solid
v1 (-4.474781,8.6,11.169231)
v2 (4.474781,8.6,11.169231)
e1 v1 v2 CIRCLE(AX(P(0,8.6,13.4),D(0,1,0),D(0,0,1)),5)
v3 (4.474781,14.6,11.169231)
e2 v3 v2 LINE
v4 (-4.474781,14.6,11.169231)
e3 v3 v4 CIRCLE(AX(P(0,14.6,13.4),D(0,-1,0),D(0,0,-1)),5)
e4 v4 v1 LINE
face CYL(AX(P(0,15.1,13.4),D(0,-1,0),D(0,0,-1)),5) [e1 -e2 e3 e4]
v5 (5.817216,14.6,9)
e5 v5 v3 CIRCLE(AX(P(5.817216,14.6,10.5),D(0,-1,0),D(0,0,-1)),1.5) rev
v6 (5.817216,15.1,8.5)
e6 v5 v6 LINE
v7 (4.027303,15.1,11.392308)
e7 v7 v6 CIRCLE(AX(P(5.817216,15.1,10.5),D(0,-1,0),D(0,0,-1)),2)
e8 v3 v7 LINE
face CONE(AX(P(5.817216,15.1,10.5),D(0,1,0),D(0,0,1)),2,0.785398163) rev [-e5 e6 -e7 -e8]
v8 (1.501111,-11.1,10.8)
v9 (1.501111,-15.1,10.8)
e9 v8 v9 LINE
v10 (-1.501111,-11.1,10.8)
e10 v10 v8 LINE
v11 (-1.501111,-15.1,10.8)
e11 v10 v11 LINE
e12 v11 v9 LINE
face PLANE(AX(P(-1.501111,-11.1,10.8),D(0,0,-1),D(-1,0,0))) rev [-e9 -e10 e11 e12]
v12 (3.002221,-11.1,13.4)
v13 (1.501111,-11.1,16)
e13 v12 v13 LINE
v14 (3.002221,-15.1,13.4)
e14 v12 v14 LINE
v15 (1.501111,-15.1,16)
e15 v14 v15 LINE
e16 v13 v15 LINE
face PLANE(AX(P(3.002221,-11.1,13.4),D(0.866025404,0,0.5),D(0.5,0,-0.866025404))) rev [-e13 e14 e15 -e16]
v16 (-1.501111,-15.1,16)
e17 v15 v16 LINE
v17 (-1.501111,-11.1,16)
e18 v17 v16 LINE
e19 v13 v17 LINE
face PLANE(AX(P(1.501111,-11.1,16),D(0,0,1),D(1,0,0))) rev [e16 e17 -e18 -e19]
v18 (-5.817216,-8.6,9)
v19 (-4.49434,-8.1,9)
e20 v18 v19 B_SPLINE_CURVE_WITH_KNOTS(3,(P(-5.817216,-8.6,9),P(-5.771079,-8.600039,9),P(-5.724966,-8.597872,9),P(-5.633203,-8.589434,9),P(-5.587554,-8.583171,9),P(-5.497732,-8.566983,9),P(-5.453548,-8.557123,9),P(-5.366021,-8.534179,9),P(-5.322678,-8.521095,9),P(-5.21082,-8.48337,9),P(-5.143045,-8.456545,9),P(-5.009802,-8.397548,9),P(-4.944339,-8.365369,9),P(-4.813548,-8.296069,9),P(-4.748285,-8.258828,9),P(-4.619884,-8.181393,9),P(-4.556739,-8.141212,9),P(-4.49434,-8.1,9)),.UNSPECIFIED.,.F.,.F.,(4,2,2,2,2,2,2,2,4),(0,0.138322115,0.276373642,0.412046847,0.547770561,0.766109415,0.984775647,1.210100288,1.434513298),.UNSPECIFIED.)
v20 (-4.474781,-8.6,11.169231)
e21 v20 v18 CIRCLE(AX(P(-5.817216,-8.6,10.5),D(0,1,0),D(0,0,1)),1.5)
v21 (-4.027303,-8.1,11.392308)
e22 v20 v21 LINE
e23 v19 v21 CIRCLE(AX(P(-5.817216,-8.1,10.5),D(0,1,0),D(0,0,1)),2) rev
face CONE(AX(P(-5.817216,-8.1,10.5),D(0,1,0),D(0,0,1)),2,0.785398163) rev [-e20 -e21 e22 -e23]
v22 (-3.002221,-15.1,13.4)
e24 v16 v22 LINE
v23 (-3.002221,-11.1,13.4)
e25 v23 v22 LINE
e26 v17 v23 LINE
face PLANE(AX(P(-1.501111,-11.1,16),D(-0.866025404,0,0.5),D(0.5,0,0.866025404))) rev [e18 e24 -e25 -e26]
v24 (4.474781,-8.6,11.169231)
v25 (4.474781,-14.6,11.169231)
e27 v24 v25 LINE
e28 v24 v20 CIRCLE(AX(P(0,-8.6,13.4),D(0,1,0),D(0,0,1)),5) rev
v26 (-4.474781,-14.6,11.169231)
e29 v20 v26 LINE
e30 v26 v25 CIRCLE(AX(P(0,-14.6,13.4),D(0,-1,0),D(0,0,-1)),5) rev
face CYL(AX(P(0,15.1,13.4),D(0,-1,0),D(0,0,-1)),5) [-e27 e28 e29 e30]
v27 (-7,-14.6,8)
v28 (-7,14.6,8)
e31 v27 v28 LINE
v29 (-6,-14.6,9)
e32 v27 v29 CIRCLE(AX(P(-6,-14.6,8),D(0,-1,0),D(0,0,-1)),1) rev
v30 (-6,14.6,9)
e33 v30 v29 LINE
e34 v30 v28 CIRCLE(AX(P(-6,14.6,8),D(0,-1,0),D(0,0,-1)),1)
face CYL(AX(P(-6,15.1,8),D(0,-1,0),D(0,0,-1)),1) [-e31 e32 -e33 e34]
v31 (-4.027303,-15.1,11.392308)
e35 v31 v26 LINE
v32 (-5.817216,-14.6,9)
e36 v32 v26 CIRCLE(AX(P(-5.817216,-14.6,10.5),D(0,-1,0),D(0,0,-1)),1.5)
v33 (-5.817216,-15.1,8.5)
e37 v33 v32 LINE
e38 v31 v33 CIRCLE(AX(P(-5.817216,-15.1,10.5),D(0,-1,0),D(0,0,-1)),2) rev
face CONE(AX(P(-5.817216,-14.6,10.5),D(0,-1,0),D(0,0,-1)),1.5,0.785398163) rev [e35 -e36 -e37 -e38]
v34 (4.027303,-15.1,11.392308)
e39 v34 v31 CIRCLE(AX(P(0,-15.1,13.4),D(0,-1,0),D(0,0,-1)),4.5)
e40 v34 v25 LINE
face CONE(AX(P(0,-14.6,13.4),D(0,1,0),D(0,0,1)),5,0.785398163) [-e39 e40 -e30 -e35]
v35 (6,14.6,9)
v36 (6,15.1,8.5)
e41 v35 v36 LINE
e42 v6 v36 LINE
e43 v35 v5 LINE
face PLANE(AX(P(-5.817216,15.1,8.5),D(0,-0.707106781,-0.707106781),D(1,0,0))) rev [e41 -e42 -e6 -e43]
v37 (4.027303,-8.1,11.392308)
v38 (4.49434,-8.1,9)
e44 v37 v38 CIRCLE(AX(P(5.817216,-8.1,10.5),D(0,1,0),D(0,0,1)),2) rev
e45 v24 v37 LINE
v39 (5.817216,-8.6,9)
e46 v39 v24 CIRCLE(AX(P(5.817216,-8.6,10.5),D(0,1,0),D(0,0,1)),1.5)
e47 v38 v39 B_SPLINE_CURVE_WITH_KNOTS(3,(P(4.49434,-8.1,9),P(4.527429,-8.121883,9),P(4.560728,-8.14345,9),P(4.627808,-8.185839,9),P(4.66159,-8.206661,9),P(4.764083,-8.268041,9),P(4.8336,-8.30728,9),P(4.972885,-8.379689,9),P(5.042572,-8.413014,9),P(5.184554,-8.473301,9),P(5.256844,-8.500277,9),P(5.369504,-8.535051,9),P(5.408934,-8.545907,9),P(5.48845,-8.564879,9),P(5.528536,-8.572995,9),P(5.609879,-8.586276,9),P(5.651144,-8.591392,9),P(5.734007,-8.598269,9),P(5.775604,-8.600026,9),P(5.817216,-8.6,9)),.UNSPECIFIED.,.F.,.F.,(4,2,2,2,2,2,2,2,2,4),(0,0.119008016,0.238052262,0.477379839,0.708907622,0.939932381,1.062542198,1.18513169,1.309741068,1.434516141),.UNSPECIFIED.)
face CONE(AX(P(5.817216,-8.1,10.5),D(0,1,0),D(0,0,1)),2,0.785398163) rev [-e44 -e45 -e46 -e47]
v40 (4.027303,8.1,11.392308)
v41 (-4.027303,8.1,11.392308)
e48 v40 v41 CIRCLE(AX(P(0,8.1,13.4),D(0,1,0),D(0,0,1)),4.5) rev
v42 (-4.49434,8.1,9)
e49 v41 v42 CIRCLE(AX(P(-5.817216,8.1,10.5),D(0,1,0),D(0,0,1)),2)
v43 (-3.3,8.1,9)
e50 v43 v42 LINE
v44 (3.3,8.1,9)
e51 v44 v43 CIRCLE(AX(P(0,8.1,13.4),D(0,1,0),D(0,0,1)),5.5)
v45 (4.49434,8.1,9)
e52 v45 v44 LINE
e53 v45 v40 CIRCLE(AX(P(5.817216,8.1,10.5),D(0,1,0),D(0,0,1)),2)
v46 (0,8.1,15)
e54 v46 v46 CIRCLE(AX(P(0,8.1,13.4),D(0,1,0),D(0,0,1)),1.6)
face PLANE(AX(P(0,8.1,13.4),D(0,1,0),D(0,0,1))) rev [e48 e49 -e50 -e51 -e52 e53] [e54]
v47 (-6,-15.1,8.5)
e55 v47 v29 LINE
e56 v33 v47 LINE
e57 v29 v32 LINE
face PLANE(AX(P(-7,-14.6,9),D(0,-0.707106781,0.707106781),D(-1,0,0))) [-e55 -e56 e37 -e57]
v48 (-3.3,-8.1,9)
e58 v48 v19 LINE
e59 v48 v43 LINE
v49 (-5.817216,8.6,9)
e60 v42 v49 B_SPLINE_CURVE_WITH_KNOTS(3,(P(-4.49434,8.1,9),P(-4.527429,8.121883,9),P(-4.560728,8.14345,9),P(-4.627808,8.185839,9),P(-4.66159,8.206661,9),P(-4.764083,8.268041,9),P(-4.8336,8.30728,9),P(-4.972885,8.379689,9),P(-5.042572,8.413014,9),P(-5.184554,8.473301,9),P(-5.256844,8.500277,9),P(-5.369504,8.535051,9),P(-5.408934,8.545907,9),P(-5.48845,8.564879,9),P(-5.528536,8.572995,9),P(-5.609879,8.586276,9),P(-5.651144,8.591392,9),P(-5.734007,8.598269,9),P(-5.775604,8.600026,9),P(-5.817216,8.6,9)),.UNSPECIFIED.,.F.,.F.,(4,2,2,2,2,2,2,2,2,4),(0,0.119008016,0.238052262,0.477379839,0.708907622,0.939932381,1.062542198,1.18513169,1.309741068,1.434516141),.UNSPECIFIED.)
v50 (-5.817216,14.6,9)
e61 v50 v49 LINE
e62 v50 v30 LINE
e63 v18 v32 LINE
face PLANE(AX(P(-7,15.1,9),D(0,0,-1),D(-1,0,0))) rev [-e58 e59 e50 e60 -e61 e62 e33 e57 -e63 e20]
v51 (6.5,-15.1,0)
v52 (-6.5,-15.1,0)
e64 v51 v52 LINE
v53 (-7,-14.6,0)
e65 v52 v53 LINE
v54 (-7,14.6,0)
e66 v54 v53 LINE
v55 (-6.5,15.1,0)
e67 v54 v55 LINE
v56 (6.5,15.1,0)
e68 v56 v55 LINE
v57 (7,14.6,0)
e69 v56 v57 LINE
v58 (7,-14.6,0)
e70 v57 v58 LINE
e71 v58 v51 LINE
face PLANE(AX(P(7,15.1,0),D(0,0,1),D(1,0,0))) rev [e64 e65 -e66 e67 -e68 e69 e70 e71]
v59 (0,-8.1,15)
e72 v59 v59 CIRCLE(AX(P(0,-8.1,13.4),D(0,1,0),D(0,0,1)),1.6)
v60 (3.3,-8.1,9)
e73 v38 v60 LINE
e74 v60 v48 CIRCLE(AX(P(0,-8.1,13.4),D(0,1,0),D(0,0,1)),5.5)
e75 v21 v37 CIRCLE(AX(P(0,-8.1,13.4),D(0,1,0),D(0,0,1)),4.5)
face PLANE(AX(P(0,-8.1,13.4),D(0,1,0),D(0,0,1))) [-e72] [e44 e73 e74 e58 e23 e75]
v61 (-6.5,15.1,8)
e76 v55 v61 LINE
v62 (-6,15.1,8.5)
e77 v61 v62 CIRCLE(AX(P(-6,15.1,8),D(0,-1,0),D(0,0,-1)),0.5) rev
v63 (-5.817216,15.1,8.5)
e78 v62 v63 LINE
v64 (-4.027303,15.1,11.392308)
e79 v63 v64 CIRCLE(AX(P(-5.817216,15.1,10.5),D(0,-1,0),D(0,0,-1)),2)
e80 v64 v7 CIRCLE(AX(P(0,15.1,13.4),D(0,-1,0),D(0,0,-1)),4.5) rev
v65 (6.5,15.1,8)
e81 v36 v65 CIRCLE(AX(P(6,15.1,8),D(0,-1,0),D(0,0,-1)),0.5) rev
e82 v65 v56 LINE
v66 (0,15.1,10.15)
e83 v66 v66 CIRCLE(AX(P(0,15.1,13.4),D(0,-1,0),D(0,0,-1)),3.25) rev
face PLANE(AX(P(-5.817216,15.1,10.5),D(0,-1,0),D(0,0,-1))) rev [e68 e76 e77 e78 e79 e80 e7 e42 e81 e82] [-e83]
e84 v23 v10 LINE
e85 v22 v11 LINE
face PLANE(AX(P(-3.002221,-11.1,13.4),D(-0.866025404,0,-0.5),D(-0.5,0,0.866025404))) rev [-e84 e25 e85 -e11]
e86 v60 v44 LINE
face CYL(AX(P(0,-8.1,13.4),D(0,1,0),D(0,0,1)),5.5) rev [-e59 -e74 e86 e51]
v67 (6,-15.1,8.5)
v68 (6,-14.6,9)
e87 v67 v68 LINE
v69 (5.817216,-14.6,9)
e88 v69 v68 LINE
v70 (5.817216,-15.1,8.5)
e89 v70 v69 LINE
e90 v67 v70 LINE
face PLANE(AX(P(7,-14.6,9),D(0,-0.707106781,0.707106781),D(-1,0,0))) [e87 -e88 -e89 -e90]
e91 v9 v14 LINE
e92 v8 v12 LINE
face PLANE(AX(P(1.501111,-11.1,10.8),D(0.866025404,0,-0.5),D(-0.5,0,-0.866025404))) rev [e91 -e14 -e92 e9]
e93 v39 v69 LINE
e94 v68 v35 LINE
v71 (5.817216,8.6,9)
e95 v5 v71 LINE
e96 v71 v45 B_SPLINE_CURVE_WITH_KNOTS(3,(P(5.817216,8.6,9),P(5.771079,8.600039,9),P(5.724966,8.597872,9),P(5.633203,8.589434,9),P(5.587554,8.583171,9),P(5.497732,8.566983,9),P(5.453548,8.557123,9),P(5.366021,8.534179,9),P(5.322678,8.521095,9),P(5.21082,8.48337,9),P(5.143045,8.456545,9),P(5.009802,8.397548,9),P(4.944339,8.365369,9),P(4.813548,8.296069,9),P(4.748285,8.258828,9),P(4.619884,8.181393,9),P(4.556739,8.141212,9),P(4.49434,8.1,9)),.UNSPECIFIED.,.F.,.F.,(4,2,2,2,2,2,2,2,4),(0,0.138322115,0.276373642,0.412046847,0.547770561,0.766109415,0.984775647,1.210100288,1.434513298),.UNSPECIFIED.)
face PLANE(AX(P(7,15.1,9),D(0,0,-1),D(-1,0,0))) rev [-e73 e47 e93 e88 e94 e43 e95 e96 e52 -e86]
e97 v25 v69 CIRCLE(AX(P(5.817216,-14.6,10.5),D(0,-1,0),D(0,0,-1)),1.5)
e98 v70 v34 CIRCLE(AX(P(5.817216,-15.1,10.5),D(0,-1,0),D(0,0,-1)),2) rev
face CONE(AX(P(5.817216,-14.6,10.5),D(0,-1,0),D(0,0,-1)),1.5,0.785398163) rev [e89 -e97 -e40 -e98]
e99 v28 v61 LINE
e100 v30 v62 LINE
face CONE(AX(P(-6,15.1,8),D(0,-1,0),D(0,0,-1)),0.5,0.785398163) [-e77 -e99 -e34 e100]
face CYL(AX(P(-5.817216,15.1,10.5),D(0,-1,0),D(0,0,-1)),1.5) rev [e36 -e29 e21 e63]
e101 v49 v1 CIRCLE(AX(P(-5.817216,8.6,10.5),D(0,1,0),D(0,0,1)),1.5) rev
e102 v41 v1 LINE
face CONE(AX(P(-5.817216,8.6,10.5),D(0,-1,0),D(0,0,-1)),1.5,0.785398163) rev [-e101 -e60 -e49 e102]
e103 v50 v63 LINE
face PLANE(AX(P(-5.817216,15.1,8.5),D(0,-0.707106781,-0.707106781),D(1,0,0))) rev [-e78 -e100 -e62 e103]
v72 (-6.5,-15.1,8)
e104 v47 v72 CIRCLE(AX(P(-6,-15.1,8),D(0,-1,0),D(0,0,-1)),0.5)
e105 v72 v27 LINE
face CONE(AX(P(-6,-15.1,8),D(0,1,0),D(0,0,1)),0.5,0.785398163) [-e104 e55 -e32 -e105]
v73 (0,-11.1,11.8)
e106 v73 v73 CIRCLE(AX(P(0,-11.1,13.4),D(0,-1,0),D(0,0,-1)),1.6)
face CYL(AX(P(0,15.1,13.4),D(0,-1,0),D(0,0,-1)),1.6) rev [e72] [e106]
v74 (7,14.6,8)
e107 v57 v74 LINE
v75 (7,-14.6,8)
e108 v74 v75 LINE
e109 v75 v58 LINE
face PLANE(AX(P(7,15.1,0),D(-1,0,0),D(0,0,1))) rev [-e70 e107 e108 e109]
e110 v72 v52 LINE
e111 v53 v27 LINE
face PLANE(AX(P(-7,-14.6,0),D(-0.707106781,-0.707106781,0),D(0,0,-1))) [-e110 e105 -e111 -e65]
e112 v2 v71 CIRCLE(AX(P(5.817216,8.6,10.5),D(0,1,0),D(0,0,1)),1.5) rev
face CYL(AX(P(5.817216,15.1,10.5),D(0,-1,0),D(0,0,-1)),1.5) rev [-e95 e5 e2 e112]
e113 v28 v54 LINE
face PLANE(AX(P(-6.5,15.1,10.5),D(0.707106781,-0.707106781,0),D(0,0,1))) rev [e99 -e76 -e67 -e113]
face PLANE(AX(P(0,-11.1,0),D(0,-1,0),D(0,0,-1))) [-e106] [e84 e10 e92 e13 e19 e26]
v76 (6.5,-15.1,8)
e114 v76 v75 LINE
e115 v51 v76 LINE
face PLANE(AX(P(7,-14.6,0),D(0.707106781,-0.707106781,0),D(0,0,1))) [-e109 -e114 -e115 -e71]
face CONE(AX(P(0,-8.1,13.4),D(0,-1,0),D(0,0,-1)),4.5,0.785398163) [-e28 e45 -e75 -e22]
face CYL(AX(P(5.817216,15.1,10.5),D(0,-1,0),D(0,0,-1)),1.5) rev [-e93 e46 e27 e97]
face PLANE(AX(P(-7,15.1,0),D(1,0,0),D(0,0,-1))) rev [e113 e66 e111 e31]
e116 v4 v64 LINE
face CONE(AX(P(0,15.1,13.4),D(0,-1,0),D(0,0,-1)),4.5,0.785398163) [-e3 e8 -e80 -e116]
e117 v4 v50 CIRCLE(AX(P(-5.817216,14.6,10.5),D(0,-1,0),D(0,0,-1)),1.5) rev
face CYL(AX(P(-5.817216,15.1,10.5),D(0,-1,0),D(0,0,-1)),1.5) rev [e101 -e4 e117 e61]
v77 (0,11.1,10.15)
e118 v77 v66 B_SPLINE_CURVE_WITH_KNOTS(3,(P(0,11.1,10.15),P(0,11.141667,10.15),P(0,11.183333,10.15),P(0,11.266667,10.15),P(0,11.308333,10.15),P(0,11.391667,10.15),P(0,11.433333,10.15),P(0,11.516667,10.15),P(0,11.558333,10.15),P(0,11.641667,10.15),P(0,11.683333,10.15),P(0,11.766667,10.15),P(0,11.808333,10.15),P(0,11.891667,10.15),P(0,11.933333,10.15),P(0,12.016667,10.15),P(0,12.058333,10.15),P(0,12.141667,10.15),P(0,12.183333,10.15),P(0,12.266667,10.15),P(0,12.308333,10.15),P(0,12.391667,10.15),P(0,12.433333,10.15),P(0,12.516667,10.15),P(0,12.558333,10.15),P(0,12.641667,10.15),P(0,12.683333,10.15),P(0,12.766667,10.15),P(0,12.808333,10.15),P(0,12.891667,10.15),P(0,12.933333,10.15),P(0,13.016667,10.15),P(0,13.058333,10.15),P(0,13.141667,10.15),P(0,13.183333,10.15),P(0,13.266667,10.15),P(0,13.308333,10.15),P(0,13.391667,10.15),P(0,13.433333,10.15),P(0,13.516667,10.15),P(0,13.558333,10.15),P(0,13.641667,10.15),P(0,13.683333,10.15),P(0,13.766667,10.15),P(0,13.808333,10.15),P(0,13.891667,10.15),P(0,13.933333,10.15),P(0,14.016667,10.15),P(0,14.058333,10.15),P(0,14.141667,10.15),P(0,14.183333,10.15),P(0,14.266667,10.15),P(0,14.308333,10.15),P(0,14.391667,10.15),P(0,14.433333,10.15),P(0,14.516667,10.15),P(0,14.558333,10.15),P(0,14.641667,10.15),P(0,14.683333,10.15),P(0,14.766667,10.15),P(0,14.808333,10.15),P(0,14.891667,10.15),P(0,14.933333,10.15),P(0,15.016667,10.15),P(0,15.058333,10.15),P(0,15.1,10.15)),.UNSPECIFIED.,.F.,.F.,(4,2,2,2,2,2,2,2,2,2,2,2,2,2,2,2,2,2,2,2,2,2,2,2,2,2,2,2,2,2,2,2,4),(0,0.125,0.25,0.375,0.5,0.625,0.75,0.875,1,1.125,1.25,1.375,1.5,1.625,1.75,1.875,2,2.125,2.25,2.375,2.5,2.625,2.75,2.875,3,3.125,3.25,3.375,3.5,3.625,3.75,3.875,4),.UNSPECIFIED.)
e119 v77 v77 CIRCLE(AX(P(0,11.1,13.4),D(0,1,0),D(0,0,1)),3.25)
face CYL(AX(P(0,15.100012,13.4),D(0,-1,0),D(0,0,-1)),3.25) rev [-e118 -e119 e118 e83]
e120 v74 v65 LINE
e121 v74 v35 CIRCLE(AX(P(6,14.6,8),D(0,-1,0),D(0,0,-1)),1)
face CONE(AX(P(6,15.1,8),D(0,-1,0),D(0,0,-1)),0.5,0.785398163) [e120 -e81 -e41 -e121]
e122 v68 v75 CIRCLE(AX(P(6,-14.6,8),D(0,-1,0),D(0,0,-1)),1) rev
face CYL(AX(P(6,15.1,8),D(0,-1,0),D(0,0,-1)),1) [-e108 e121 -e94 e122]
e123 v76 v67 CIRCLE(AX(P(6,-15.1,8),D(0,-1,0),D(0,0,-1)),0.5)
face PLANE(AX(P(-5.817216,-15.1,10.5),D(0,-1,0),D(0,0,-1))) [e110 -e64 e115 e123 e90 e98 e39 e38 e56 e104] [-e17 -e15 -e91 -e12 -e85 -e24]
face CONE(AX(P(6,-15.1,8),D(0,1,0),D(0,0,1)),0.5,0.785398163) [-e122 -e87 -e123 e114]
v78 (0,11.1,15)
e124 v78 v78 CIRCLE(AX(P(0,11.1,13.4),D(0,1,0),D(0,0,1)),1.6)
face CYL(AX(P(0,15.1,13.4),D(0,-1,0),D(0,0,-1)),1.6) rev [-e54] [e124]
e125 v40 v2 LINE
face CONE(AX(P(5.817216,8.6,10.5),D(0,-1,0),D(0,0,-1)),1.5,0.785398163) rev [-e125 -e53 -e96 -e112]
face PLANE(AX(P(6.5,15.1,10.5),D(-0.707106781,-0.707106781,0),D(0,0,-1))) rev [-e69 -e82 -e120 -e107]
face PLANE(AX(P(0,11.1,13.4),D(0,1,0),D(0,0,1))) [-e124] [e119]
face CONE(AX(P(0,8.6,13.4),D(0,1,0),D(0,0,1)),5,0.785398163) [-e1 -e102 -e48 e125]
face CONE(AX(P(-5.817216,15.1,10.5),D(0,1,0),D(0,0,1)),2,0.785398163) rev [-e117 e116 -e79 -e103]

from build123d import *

# Parameters (mm, degrees)
CROQUIS2_R                 = 1.6
SALIENTE_EXTRUIR1_DEPTH    = 15.1
CORTAR_EXTRUIR4_DEPTH      = 8.1
CORTAR_EXTRUIR2_DEPTH      = 37.049965326
CORTAR_EXTRUIR2_DEPTH_BACK = 4
CROQUIS4_R                 = 3.25
CORTAR_EXTRUIR3_DEPTH      = 4
REDONDEO2_R                = 1
CHAFL_N1_SIZE              = 0.5


with BuildPart() as part:
    # Croquis2 → Saliente-Extruir1 (new, symmetric)
    with BuildSketch(Plane(origin=(0, 0, 0), x_dir=(0, 0, -1), z_dir=(0, 1, 0))):
        with BuildLine():
            Line((0, -7), (0, 7))
            Line((0, 7), (-9, 7))
            Line((-9, 7), (-9, 5.817215829))
            ThreePointArc((-9, 5.817215829), (-9.710647783, 4.541706881), (-11.169230769, 4.474781407))
            ThreePointArc((-11.169230769, 4.474781407), (-18.4, 0), (-11.169230769, -4.474781407))
            ThreePointArc((-11.169230769, -4.474781407), (-9.710647783, -4.541706881), (-9, -5.817215829))
            Line((-9, -5.817215829), (-9, -7))
            Line((-9, -7), (0, -7))
        make_face()
        with Locations(Location((-13.4, 0, 0), (0, 0, 180))):
            Circle(CROQUIS2_R, mode=Mode.SUBTRACT)
    extrude(amount=SALIENTE_EXTRUIR1_DEPTH, both=True)

    # Croquis6 → Cortar-Extruir4 (cut, symmetric)
    with BuildSketch(Plane(origin=(0, 0, 0), x_dir=(1, 0, 0), z_dir=(0, 1, 0))):
        with BuildLine():
            Line((-7, -9), (-3.3, -9))
            ThreePointArc((-3.3, -9), (0, -7.9), (3.3, -9))
            Line((3.3, -9), (7, -9))
            Line((7, -9), (7, -18.9))
            Line((7, -18.9), (-7, -18.9))
            Line((-7, -18.9), (-7, -9))
        make_face()
    extrude(amount=CORTAR_EXTRUIR4_DEPTH, both=True, mode=Mode.SUBTRACT)

    # Croquis4 → Cortar-Extruir2 (cut, two sides: drawn at the far end of the back side and taken through both)
    with BuildSketch(Plane(origin=(0, 15.1, 0), x_dir=(1, 0, 0), z_dir=(0, 1, 0)).offset(-CORTAR_EXTRUIR2_DEPTH_BACK)):
        with Locations(Location((0, -13.4, 0), (0, 0, 90))):
            Circle(CROQUIS4_R)
    extrude(amount=CORTAR_EXTRUIR2_DEPTH + CORTAR_EXTRUIR2_DEPTH_BACK, mode=Mode.SUBTRACT)

    # Croquis5 → Cortar-Extruir3 (cut)
    with BuildSketch(Plane.XZ.offset(15.1)):
        Polygon((1.5011107, 10.8), (3.0022214, 13.4), (1.5011107, 16), (-1.5011107, 16), (-3.0022214, 13.4), (-1.5011107, 10.8), align=None)
    extrude(amount=-CORTAR_EXTRUIR3_DEPTH, mode=Mode.SUBTRACT)

    # Redondeo2
    redondeo2_edges = [part.edges().sort_by_distance(p)[0] for p in [
        (7, 0, 9),
        (-7, 0, 9),
    ]]
    fillet(redondeo2_edges, radius=REDONDEO2_R)

    # Chaflán1
    # the kernel refuses this chamfer: 0.5 mm, written as the material it takes off along each edge
    with BuildSketch(Plane(origin=(0, -15.1, 13.4), x_dir=(-0.8949562813691682, 0, -0.44615384615384657), z_dir=(0.44615384615384657, 0, -0.8949562813691682))) as chafl_n1_piece_1:
        Polygon((5 - CHAFL_N1_SIZE, 0), (5, CHAFL_N1_SIZE), (5, 0), align=None)
    revolve(axis=Axis((0, -15.1, 13.4), (0, 1, 0)), revolution_arc=232.994370335, mode=Mode.SUBTRACT)
    with BuildSketch(Plane(origin=(-5.817215829, -15.1, 10.5), x_dir=(0, 0, -1), z_dir=(-1, 0, 0))) as chafl_n1_piece_2:
        Polygon((1.5 + CHAFL_N1_SIZE, 0), (1.5, -CHAFL_N1_SIZE), (1.5, 0), align=None)
    revolve(axis=Axis((-5.817215829, -15.1, 10.5), (0, -1, 0)), revolution_arc=116.497185168, mode=Mode.SUBTRACT)
    with BuildSketch(Plane(origin=(-7, -15.1, -1.285841494), x_dir=(0.9996219169112968, -0.027495876610585647, 0), z_dir=(0, 0, 1)), Plane(origin=(-7, 15.1, -1.285841494), x_dir=(-0.027495876610585647, -0.9996219169112968, 0), z_dir=(0, 0, 1)), Plane(origin=(7, -15.1, 8), x_dir=(-0.9996219169112968, -0.027495876610585647, 0), z_dir=(0, 0, -1)), Plane(origin=(7, 15.1, 8), x_dir=(0.027495876610585647, -0.9996219169112968, 0), z_dir=(0, 0, -1))) as chafl_n1_piece_3:
        Polygon((CHAFL_N1_SIZE * 0.999621916911, CHAFL_N1_SIZE * 0.0274958766106), (-CHAFL_N1_SIZE * 0.0274958766106, CHAFL_N1_SIZE * 0.999621916911), (0, 0), align=None)
    extrude(amount=9.285841494, mode=Mode.SUBTRACT)
    with BuildSketch(Plane(origin=(-5.817215829, 15.1, 10.5), x_dir=(0, 0, -1), z_dir=(-1, 0, 0))) as chafl_n1_piece_4:
        Polygon((1.5 + CHAFL_N1_SIZE, 0), (1.5, CHAFL_N1_SIZE), (1.5, 0), align=None)
    revolve(axis=Axis((-5.817215829, 15.1, 10.5), (0, -1, 0)), revolution_arc=116.497185168, mode=Mode.SUBTRACT)
    with BuildSketch(Plane(origin=(0, 15.1, 13.4), x_dir=(-0.8949562813691682, 0, -0.44615384615384657), z_dir=(0.44615384615384657, 0, -0.8949562813691682))) as chafl_n1_piece_5:
        Polygon((5 - CHAFL_N1_SIZE, 0), (5, -CHAFL_N1_SIZE), (5, 0), align=None)
    revolve(axis=Axis((0, 15.1, 13.4), (0, 1, 0)), revolution_arc=232.994370335, mode=Mode.SUBTRACT)
    with BuildSketch(Plane(origin=(5.817215829, 15.1, 10.5), x_dir=(-0.8949562813691686, 0, 0.44615384615384585), z_dir=(0.44615384615384585, 0, 0.8949562813691686))) as chafl_n1_piece_6:
        Polygon((1.5 + CHAFL_N1_SIZE, 0), (1.5, CHAFL_N1_SIZE), (1.5, 0), align=None)
    revolve(axis=Axis((5.817215829, 15.1, 10.5), (0, -1, 0)), revolution_arc=116.497185168, mode=Mode.SUBTRACT)
    with BuildSketch(Plane(origin=(5.817215829, 15.1, 9), x_dir=(0, -0.9996219169112968, 0.027495876610585647), z_dir=(1, 0, 0)), Plane(origin=(-6, -15.1, 9), x_dir=(0, -0.027495876610585647, -0.9996219169112968), z_dir=(1, 0, 0)), Plane(origin=(-6, 15.1, 9), x_dir=(0, -0.9996219169112968, 0.027495876610585647), z_dir=(1, 0, 0)), Plane(origin=(5.817215829, -15.1, 9), x_dir=(0, -0.027495876610585647, -0.9996219169112968), z_dir=(1, 0, 0))) as chafl_n1_piece_7:
        Polygon((CHAFL_N1_SIZE * 0.999621916911, CHAFL_N1_SIZE * 0.0274958766106), (-CHAFL_N1_SIZE * 0.0274958766106, CHAFL_N1_SIZE * 0.999621916911), (0, 0), align=None)
    extrude(amount=0.182784171, mode=Mode.SUBTRACT)
    with BuildSketch(Plane(origin=(-5.817215829, 8.1, 10.5), x_dir=(0.8949562813691686, 0, 0.44615384615384585), z_dir=(-0.44615384615384585, 0, 0.8949562813691686))) as chafl_n1_piece_8_section:
        Polygon((1.5 + CHAFL_N1_SIZE, 0), (1.5, CHAFL_N1_SIZE), (1.5, 0), align=None)
    chafl_n1_piece_8 = revolve(axis=Axis((-5.817215829, 8.1, 10.5), (0, 1, 0)), revolution_arc=165.645776503, mode=Mode.PRIVATE)
    chafl_n1_piece_8 = split(chafl_n1_piece_8, bisect_by=Plane(origin=(-4.168851262, 8.241008039, 9), z_dir=(0, 0, 1)), keep=Keep.TOP, mode=Mode.PRIVATE)
    add(chafl_n1_piece_8, mode=Mode.SUBTRACT)
    with BuildSketch(Plane(origin=(0, 8.1, 13.4), x_dir=(-0.8949562813691682, 0, -0.44615384615384657), z_dir=(0.44615384615384657, 0, -0.8949562813691682))) as chafl_n1_piece_9:
        Polygon((5 - CHAFL_N1_SIZE, 0), (5, CHAFL_N1_SIZE), (5, 0), align=None)
    revolve(axis=Axis((0, 8.1, 13.4), (0, 1, 0)), revolution_arc=232.994370335, mode=Mode.SUBTRACT)
    with BuildSketch(Plane(origin=(5.817215829, 8.1, 10.5), x_dir=(0.7564084690774899, 0, -0.6540995550433039), z_dir=(0.6540995550433039, 0, 0.7564084690774899))) as chafl_n1_piece_10_section:
        Polygon((1.5, CHAFL_N1_SIZE), (1.5 + CHAFL_N1_SIZE, 0), (1.5, 0), align=None)
    chafl_n1_piece_10 = revolve(axis=Axis((5.817215829, 8.1, 10.5), (0, 1, 0)), revolution_arc=165.645776503, mode=Mode.PRIVATE)
    chafl_n1_piece_10 = split(chafl_n1_piece_10, bisect_by=Plane(origin=(4.495767194, 8.276282953, 9), z_dir=(0, 0, 1)), keep=Keep.TOP, mode=Mode.PRIVATE)
    add(chafl_n1_piece_10, mode=Mode.SUBTRACT)
    with BuildSketch(Plane(origin=(-5.817215829, -8.1, 10.5), x_dir=(0.8949562813691686, 0, 0.44615384615384585), z_dir=(-0.44615384615384585, 0, 0.8949562813691686))) as chafl_n1_piece_11_section:
        Polygon((1.5, -CHAFL_N1_SIZE), (1.5 + CHAFL_N1_SIZE, 0), (1.5, 0), align=None)
    chafl_n1_piece_11 = revolve(axis=Axis((-5.817215829, -8.1, 10.5), (0, 1, 0)), revolution_arc=165.645776503, mode=Mode.PRIVATE)
    chafl_n1_piece_11 = split(chafl_n1_piece_11, bisect_by=Plane(origin=(-4.495767364, -8.276282993, 9), z_dir=(0, 0, 1)), keep=Keep.TOP, mode=Mode.PRIVATE)
    add(chafl_n1_piece_11, mode=Mode.SUBTRACT)
    with BuildSketch(Plane(origin=(0, -8.1, 13.4), x_dir=(-0.8949562813691682, 0, -0.44615384615384657), z_dir=(0.44615384615384657, 0, -0.8949562813691682))) as chafl_n1_piece_12:
        Polygon((5, -CHAFL_N1_SIZE), (5 - CHAFL_N1_SIZE, 0), (5, 0), align=None)
    revolve(axis=Axis((0, -8.1, 13.4), (0, 1, 0)), revolution_arc=232.994370335, mode=Mode.SUBTRACT)
    with BuildSketch(Plane(origin=(5.817215829, -8.1, 10.5), x_dir=(0.7564084690774899, 0, -0.6540995550433039), z_dir=(0.6540995550433039, 0, 0.7564084690774899))) as chafl_n1_piece_13_section:
        Polygon((1.5, -CHAFL_N1_SIZE), (1.5 + CHAFL_N1_SIZE, 0), (1.5, 0), align=None)
    chafl_n1_piece_13 = revolve(axis=Axis((5.817215829, -8.1, 10.5), (0, 1, 0)), revolution_arc=165.645776503, mode=Mode.PRIVATE)
    chafl_n1_piece_13 = split(chafl_n1_piece_13, bisect_by=Plane(origin=(4.495767194, -8.276282953, 9), z_dir=(0, 0, 1)), keep=Keep.TOP, mode=Mode.PRIVATE)
    add(chafl_n1_piece_13, mode=Mode.SUBTRACT)
    with BuildSketch(Plane(origin=(6, -15.1, 8), x_dir=(1, 0, 0), z_dir=(0, 0, -1))) as chafl_n1_piece_14:
        Polygon((1 - CHAFL_N1_SIZE, 0), (1, -CHAFL_N1_SIZE), (1, 0), align=None)
    revolve(axis=Axis((6, -15.1, 8), (0, -1, 0)), revolution_arc=90, mode=Mode.SUBTRACT)
    with BuildSketch(Plane(origin=(-6, -15.1, 8), x_dir=(-1, 0, 0), z_dir=(0, 0, -1))) as chafl_n1_piece_15:
        Polygon((1 - CHAFL_N1_SIZE, 0), (1, CHAFL_N1_SIZE), (1, 0), align=None)
    revolve(axis=Axis((-6, -15.1, 8), (0, 1, 0)), revolution_arc=90, mode=Mode.SUBTRACT)
    with BuildSketch(Plane(origin=(6, 15.1, 8), x_dir=(1, 0, 0), z_dir=(0, 0, -1))) as chafl_n1_piece_16:
        Polygon((1, CHAFL_N1_SIZE), (1 - CHAFL_N1_SIZE, 0), (1, 0), align=None)
    revolve(axis=Axis((6, 15.1, 8), (0, -1, 0)), revolution_arc=90, mode=Mode.SUBTRACT)
    with BuildSketch(Plane(origin=(5.817215829, -15.1, 10.5), x_dir=(-0.8949562813691686, 0, 0.44615384615384585), z_dir=(0.44615384615384585, 0, 0.8949562813691686))) as chafl_n1_piece_17:
        Polygon((1.5 + CHAFL_N1_SIZE, 0), (1.5, -CHAFL_N1_SIZE), (1.5, 0), align=None)
    revolve(axis=Axis((5.817215829, -15.1, 10.5), (0, -1, 0)), revolution_arc=116.497185168, mode=Mode.SUBTRACT)
    with BuildSketch(Plane(origin=(-6, 15.1, 8), x_dir=(-1, 0, 0), z_dir=(0, 0, -1))) as chafl_n1_piece_18:
        Polygon((1, -CHAFL_N1_SIZE), (1 - CHAFL_N1_SIZE, 0), (1, 0), align=None)
    revolve(axis=Axis((-6, 15.1, 8), (0, 1, 0)), revolution_arc=90, mode=Mode.SUBTRACT)


solid = part.part
